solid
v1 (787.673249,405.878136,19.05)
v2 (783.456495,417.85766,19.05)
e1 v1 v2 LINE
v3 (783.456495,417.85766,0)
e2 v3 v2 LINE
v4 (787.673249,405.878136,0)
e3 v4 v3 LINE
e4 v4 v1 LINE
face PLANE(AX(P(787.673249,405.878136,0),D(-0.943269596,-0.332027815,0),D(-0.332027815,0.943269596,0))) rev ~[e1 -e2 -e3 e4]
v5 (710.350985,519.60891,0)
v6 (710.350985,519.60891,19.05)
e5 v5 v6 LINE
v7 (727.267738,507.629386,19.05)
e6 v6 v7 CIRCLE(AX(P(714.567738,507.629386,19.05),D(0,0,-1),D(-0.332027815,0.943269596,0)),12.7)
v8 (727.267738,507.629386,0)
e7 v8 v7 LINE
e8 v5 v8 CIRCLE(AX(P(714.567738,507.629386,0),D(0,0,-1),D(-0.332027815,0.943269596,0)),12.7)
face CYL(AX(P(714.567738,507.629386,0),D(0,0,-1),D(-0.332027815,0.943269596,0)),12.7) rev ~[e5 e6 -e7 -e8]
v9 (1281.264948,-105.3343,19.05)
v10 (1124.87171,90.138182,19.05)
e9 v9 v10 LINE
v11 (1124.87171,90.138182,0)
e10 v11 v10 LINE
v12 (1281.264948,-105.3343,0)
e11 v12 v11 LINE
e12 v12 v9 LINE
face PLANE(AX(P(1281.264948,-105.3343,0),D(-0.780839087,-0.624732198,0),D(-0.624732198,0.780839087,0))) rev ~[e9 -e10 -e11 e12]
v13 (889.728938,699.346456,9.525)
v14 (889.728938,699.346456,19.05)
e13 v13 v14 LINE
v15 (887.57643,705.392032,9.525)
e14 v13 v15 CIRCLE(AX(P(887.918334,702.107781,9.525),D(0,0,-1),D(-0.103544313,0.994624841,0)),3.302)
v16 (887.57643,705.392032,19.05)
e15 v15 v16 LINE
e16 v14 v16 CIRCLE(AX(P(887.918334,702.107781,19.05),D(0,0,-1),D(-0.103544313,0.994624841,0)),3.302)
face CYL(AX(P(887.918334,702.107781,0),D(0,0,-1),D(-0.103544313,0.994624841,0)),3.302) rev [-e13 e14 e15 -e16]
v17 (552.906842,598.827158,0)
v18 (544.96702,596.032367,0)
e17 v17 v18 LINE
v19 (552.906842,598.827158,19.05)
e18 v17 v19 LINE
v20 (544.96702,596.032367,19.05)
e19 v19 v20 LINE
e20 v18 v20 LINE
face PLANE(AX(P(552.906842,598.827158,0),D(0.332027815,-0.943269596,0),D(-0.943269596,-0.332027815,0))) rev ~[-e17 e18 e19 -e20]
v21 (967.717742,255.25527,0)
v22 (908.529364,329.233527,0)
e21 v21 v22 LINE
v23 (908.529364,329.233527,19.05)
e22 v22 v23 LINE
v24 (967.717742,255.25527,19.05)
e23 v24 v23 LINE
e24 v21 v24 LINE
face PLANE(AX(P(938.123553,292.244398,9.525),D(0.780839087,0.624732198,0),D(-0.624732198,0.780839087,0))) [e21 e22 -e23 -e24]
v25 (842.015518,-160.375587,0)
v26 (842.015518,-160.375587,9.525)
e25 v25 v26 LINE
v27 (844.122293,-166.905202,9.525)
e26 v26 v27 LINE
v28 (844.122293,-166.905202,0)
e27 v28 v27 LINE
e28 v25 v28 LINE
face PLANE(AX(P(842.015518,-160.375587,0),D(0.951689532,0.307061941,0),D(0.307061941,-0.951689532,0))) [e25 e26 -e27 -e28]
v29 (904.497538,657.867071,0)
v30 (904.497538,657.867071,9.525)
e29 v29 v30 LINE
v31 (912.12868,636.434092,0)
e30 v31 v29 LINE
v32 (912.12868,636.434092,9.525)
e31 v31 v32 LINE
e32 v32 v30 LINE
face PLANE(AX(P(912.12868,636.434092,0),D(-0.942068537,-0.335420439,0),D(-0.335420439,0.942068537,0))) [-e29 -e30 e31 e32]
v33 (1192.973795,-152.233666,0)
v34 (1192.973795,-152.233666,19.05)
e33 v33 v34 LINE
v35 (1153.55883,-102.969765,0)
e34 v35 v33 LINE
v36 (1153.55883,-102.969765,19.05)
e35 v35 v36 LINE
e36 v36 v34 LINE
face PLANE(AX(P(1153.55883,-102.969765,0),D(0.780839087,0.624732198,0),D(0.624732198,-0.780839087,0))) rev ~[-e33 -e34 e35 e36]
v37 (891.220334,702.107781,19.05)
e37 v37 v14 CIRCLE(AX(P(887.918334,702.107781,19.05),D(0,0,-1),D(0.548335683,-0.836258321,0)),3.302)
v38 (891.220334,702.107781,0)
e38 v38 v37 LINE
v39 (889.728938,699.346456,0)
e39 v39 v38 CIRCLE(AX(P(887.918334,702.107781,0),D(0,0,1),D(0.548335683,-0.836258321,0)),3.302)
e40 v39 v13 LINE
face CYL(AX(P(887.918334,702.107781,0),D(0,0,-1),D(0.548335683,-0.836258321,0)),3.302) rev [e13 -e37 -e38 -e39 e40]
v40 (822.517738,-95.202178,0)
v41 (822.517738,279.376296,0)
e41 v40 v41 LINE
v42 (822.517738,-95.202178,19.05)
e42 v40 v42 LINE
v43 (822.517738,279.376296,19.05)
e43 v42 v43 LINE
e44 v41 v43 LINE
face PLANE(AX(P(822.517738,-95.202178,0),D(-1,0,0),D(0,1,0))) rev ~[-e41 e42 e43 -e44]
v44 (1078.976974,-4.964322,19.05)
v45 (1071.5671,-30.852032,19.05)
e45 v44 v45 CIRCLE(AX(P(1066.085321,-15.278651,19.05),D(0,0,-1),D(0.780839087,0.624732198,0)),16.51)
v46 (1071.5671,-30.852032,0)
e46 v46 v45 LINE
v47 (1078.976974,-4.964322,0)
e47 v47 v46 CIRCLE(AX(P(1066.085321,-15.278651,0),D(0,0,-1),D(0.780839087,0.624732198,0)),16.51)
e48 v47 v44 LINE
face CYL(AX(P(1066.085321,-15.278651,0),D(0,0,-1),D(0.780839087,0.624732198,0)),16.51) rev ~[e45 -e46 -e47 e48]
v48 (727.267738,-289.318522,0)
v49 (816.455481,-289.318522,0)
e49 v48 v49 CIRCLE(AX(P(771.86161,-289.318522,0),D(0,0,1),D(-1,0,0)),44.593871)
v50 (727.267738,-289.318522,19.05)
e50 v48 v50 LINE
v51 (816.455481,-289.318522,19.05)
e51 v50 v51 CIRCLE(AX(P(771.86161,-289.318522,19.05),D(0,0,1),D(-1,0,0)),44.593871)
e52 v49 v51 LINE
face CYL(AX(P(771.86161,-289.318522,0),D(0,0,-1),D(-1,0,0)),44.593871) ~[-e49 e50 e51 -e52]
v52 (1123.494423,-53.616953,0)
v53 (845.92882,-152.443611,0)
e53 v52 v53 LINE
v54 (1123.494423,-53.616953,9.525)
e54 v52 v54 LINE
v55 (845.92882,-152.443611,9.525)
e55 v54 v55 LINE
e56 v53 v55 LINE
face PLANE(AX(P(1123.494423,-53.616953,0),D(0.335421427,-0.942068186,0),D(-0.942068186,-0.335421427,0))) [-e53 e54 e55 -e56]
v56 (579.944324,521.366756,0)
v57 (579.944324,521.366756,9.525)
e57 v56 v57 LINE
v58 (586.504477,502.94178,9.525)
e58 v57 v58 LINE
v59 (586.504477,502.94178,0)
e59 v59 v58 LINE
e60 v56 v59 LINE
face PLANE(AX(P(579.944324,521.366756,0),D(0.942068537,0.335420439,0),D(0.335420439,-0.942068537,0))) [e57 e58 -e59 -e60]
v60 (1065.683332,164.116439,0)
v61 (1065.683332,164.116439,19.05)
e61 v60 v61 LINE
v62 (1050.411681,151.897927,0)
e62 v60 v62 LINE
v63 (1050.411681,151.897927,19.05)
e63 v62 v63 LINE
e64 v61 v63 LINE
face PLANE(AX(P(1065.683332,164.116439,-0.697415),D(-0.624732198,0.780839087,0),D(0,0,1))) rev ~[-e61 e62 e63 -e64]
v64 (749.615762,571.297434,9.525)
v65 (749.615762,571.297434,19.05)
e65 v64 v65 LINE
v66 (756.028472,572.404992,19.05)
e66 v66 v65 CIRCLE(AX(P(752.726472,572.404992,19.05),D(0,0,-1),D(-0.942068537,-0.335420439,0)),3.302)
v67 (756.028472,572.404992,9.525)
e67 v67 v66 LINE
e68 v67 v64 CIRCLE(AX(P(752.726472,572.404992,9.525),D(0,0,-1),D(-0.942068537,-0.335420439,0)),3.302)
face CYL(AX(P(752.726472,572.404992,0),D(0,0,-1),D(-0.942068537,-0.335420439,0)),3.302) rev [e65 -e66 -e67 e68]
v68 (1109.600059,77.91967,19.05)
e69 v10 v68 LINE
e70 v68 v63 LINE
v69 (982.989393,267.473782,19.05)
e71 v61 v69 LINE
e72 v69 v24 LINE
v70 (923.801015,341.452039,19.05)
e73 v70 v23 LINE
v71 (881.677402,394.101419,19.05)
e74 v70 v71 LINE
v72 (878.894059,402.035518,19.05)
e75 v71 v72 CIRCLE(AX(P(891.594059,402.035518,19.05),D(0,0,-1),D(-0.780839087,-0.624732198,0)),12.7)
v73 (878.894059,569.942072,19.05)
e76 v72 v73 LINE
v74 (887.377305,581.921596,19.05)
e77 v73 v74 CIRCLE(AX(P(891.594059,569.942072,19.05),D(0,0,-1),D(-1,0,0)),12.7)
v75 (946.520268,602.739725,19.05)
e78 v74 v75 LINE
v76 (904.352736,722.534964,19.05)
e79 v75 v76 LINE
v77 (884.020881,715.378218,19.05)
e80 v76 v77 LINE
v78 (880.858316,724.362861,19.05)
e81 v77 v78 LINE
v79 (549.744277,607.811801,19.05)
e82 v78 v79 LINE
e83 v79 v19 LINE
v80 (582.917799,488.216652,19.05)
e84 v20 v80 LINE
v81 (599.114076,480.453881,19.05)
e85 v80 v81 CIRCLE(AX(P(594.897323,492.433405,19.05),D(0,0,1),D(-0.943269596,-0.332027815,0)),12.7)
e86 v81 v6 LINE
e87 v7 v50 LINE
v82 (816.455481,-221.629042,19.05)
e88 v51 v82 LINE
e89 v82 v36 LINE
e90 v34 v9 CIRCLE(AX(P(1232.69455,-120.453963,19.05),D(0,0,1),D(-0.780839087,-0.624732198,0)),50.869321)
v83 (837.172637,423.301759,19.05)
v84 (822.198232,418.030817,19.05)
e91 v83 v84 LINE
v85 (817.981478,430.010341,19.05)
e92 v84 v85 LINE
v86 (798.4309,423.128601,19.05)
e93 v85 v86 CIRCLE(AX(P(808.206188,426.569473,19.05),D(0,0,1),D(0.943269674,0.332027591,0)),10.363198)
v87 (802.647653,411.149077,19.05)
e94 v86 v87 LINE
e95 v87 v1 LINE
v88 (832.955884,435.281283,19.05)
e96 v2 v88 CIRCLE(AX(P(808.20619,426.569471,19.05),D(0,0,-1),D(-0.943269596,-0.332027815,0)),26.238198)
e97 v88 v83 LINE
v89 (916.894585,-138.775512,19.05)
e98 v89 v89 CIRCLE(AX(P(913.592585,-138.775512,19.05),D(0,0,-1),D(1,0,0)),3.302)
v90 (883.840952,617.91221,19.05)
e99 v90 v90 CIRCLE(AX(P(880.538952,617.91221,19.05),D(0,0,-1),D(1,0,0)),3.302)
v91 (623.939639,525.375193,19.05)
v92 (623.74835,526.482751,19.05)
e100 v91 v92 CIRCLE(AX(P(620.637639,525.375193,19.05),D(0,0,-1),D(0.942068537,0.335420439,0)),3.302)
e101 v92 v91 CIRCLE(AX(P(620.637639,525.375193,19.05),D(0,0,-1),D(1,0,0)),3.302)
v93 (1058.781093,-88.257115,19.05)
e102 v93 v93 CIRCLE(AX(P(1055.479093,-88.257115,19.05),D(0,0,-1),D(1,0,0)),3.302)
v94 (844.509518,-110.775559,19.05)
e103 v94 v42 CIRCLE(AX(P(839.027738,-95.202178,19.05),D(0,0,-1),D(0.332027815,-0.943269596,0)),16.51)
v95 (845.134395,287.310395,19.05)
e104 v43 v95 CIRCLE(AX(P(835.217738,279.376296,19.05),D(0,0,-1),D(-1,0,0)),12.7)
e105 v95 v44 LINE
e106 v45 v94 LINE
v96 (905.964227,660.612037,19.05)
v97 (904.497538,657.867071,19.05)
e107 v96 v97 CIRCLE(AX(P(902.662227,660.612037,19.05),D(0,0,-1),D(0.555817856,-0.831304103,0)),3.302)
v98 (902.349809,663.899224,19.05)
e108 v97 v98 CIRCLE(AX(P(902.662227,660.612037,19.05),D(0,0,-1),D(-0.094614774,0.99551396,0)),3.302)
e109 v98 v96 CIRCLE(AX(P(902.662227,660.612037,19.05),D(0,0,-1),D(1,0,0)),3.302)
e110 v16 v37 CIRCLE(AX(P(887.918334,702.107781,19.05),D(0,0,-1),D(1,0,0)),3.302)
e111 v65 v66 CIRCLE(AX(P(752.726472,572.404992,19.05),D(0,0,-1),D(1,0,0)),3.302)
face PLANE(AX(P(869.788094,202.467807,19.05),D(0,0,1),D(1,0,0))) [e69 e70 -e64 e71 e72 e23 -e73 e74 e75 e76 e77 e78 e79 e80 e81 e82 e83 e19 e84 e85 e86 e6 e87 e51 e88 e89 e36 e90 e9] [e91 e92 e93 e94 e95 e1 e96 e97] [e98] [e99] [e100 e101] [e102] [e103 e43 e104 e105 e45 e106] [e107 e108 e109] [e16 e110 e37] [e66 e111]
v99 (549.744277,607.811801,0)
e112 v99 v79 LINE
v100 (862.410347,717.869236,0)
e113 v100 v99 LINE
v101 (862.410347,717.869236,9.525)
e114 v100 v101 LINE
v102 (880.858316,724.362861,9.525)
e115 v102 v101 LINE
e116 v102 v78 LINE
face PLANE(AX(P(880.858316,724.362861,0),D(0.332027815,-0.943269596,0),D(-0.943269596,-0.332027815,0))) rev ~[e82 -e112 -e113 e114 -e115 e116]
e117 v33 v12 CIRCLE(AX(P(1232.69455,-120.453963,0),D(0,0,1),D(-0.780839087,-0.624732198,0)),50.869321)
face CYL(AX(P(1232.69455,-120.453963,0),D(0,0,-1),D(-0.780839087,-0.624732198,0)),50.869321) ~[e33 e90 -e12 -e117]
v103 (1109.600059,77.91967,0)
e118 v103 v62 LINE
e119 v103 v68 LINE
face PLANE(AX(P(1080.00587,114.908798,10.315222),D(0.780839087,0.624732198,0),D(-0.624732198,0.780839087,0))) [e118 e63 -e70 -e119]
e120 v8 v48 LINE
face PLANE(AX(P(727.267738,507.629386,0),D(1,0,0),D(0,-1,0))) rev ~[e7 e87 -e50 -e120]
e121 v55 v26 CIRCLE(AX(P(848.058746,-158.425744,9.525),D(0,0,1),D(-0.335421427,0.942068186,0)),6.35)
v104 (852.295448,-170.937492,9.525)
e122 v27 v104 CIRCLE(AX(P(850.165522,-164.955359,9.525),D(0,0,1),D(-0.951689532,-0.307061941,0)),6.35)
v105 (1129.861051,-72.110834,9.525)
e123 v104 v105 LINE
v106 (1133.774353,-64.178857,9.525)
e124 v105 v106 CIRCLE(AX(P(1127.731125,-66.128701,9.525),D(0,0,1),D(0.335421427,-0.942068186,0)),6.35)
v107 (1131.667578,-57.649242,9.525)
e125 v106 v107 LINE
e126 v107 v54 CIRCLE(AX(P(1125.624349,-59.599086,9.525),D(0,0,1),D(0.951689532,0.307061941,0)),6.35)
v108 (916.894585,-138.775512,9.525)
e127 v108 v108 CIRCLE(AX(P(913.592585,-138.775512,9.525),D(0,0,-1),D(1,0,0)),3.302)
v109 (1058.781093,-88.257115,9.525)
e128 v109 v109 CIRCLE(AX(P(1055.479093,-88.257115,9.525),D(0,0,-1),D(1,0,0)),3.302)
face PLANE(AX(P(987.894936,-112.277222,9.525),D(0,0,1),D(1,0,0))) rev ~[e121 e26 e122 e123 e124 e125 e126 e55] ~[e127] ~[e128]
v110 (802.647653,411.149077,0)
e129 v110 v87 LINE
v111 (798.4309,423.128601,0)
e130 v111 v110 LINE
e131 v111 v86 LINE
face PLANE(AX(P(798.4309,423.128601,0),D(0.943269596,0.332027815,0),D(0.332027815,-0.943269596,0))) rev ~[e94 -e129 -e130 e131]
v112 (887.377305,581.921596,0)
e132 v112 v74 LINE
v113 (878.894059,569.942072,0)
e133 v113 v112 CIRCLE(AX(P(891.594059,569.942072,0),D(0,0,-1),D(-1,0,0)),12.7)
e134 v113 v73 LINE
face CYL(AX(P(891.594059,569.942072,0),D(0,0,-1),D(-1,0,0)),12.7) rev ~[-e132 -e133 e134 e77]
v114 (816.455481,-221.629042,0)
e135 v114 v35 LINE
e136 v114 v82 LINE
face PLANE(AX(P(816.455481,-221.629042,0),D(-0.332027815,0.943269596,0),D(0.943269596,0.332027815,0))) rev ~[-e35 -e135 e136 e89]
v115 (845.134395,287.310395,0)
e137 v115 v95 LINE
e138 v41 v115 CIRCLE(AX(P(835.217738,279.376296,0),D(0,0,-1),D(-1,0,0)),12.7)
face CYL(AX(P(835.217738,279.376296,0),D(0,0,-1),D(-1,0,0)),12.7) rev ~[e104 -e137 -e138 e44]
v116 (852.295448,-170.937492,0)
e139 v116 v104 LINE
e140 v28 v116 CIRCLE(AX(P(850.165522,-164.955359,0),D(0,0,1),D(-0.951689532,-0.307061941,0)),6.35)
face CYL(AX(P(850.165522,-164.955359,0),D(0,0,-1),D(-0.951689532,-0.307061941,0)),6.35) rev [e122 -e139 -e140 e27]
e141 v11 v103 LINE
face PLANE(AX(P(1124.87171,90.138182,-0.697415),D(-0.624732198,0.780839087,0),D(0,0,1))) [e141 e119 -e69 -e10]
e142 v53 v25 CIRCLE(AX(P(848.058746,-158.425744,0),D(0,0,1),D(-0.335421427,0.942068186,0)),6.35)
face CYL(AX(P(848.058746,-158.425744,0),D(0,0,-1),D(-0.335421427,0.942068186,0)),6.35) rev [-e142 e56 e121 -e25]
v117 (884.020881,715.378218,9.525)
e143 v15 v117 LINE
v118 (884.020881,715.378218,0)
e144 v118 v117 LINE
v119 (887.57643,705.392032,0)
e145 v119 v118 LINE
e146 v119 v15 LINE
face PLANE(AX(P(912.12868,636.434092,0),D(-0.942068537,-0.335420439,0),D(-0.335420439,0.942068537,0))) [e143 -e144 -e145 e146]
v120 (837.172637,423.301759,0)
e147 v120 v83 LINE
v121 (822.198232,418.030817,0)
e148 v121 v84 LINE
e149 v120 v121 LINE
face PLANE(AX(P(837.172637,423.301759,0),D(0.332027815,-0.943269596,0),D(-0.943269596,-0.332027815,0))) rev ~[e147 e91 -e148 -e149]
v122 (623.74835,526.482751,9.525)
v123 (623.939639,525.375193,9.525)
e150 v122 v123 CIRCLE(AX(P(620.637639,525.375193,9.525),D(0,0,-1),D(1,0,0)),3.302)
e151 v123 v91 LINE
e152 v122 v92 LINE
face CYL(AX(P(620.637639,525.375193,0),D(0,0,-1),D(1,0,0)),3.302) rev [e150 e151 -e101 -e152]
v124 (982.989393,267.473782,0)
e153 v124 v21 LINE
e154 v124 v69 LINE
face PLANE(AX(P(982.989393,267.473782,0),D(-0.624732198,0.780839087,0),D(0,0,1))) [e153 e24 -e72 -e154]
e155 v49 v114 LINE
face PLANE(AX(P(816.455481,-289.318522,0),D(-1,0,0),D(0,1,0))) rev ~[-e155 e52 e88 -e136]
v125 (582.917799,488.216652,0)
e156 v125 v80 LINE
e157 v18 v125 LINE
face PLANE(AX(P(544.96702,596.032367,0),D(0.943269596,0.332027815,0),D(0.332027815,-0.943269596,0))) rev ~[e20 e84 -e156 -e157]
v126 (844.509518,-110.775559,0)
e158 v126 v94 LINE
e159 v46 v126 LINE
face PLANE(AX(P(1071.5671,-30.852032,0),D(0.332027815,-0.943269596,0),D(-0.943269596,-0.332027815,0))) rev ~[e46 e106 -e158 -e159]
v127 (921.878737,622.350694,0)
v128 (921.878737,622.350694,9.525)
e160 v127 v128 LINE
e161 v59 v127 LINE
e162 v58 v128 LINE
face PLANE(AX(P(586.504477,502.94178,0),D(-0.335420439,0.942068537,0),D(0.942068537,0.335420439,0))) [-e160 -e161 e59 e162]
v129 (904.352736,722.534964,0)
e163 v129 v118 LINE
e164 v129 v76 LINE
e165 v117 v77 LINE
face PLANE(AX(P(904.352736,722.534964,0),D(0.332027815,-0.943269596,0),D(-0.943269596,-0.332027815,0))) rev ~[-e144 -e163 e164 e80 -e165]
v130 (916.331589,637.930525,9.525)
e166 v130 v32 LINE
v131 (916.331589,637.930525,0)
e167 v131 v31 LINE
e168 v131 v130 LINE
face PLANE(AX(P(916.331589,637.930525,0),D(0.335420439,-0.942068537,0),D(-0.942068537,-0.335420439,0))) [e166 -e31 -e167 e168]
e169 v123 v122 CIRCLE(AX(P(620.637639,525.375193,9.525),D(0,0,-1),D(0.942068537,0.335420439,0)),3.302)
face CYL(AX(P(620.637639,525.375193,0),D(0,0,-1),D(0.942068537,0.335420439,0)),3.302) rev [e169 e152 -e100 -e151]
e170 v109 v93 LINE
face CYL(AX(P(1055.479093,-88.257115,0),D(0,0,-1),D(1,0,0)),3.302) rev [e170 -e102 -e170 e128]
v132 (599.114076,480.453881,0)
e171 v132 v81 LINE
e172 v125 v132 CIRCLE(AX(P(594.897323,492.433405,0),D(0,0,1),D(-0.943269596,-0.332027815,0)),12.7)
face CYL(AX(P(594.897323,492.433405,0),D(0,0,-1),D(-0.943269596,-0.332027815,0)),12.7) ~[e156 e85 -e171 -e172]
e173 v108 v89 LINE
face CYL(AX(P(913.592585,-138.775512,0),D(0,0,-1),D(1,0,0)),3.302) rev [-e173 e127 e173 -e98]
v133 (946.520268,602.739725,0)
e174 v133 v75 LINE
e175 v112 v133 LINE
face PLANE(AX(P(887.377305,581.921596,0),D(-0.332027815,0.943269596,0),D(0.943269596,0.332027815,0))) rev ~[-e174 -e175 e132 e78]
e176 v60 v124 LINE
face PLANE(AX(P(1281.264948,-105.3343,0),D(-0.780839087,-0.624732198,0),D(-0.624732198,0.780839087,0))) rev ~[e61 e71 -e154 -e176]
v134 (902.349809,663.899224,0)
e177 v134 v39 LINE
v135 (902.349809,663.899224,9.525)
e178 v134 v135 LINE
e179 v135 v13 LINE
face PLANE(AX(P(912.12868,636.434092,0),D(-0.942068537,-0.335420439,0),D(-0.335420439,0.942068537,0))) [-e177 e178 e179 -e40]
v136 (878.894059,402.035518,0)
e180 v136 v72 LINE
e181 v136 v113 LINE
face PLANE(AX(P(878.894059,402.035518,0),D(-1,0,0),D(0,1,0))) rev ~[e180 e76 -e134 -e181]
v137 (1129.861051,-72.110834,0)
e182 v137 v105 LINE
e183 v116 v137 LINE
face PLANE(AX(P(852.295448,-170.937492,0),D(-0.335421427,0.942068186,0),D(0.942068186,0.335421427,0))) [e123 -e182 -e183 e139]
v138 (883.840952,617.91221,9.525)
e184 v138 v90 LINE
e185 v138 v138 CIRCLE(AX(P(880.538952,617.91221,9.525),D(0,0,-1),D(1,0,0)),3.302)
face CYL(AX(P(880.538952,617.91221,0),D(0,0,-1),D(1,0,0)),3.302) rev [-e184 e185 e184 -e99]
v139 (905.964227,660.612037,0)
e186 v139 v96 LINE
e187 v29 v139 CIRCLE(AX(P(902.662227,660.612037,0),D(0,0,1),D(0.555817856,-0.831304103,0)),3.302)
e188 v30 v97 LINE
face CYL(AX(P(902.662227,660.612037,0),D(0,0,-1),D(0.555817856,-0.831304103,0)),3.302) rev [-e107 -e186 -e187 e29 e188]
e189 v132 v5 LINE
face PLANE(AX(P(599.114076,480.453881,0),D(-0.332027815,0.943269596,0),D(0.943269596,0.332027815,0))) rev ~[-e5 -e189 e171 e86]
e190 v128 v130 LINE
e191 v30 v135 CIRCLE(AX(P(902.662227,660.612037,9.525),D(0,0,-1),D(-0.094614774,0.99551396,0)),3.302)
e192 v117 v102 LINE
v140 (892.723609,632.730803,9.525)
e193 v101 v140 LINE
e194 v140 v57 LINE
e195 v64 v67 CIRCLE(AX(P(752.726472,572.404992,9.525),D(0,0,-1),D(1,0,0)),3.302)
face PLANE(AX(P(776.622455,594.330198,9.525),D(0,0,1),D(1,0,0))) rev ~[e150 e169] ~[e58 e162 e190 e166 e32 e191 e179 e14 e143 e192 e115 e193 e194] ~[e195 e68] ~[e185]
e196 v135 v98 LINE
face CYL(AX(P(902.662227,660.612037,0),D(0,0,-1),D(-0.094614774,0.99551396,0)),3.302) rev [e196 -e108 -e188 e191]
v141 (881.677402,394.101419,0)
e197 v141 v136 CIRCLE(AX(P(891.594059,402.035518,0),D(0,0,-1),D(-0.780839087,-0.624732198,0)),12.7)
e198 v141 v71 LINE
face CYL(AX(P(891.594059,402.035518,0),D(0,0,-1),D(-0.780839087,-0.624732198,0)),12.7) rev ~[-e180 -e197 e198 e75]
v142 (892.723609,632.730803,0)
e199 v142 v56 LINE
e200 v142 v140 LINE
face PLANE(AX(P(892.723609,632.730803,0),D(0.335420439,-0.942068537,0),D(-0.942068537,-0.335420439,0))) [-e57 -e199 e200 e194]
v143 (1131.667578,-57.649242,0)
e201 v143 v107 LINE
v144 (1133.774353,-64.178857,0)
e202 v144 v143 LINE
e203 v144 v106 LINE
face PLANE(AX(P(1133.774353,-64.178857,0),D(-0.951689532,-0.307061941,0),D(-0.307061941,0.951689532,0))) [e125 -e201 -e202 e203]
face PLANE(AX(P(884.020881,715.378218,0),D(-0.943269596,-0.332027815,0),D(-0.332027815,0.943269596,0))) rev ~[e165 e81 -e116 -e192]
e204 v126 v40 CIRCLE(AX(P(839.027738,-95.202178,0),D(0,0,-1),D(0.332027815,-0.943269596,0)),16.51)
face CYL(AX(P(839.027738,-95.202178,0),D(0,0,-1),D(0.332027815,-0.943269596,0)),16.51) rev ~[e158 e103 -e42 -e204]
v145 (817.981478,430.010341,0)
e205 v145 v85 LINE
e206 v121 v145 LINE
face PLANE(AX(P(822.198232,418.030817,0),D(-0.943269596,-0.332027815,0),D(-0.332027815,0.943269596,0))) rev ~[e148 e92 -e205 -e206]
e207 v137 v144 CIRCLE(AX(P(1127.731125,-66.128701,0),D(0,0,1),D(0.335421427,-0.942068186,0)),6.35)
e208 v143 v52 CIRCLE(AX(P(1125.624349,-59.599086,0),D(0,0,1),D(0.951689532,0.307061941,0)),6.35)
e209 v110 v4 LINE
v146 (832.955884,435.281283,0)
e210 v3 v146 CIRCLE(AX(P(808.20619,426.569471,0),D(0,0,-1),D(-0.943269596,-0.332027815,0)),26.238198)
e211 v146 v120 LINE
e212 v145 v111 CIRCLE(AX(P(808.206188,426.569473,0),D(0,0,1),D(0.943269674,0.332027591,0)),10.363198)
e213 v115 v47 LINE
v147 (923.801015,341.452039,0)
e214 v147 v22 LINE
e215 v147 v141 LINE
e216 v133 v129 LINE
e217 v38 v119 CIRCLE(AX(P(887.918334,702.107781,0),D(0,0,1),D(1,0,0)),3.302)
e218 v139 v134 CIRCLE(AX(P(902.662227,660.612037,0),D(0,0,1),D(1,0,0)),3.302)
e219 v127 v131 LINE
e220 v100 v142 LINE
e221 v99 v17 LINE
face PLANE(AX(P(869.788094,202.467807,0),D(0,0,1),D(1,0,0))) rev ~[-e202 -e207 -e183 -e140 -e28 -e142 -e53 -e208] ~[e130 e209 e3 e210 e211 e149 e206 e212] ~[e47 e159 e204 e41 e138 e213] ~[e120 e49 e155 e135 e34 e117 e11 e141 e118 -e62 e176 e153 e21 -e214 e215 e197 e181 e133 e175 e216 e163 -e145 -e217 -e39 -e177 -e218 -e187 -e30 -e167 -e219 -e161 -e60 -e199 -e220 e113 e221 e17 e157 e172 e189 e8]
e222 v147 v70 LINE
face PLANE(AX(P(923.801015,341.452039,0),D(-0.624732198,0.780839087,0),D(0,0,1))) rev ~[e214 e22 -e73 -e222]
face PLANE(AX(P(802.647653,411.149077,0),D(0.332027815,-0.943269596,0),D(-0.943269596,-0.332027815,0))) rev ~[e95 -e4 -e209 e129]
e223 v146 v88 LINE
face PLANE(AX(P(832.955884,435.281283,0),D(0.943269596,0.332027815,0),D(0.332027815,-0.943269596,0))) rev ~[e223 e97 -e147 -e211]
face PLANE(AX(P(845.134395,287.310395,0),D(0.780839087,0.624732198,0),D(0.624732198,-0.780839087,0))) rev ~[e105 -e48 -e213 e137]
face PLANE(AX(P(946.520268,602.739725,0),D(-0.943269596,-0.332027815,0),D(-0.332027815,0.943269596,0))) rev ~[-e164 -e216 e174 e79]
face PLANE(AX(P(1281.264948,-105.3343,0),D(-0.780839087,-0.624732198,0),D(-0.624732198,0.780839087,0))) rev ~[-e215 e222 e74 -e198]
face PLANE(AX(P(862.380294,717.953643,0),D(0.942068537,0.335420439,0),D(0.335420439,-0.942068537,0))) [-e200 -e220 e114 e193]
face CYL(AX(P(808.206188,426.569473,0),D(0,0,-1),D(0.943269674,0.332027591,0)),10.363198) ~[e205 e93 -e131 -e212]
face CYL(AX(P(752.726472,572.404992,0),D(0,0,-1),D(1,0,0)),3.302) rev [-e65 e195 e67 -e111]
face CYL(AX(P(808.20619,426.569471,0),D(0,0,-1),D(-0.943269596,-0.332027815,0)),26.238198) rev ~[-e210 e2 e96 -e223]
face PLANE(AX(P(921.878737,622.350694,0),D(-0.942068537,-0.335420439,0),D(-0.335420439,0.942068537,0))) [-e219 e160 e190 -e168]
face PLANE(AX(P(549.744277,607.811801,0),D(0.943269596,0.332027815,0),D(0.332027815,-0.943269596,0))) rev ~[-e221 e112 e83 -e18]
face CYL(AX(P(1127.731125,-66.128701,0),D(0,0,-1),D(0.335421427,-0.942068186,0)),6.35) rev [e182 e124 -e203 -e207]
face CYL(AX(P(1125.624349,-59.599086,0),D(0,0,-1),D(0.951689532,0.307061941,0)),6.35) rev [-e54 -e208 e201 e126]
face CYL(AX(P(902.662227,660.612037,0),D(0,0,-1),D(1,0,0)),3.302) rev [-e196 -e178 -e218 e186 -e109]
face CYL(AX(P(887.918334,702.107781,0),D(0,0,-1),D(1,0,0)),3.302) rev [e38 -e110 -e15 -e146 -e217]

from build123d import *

# Parameters (mm, degrees)
F1_DEPTH = 19.05
F3_DEPTH = 9.525
F5_DEPTH = 9.525
F6_W     = 94.742
F6_H     = 19.05
F6_H_2   = 22.0252738774
F7_DEPTH = 19.558
F8_R     = 3.302
F9_DEPTH = 19.051


# Not quite as in the source:
# - ends of sketch curves that miss each other by under 0.0002 mm in the source are joined
# - a feature names something its author has since deleted; it is built from what else it names
# - the program builds the solid bodies; features that only make, move or delete a surface that nothing else refers to are left out


with BuildPart() as f1:
    # F0 (on Top) → F1 (new body)
    with BuildSketch(Plane.XY):
        with BuildLine():
            Line((727.2677384075, 507.6293858847), (727.2677384075, -289.3185215378))
            ThreePointArc((727.2677384075, -289.3185215378), (771.8616098047, -333.912392935), (816.4554812019, -289.3185215378))
            Line((816.4554812019, -289.3185215378), (816.4554812019, -221.6290421598))
            Line((816.4554812019, -221.6290421598), (1153.5588304871, -102.9697649078))
            Line((1153.5588304871, -102.9697649078), (1192.9737952894, -152.2336658633))
            ThreePointArc((1192.9737952894, -152.2336658633), (1256.5580507142, -165.3785793409), (1281.2649482254, -105.3342998163))
            Line((1281.2649482254, -105.3342998163), (881.6774022659, 394.10141923))
            ThreePointArc((881.6774022659, 394.10141923), (879.6100790274, 397.83144491), (878.8940586752, 402.0355181492))
            Line((878.8940586752, 402.0355181492), (878.8940586752, 569.9420720746))
            ThreePointArc((878.8940586752, 569.9420720746), (881.2296299338, 577.2815963686), (887.3773054254, 581.9215959395))
            Line((887.3773054254, 581.9215959395), (946.5202680448, 602.7397254948))
            Line((946.5202680448, 602.7397254948), (904.3527355464, 722.5349641439))
            Line((904.3527355464, 722.5349641439), (884.020881133, 715.3782178375))
            Line((884.020881133, 715.3782178375), (880.8583161956, 724.3628607361))
            Line((880.8583161956, 724.3628607361), (549.7442765695, 607.8118009104))
            Line((549.7442765695, 607.8118009104), (552.906841507, 598.8271580117))
            Line((552.906841507, 598.8271580117), (544.9670195991, 596.0323666485))
            Line((544.9670195991, 596.0323666485), (582.9177988478, 488.2166518643))
            ThreePointArc((582.9177988478, 488.2166518643), (589.40821497, 480.9809077363), (599.1140759625, 480.4538812492))
            Line((599.1140759625, 480.4538812492), (710.3509851577, 519.6089097496))
            ThreePointArc((710.3509851577, 519.6089097497), (721.9072627016, 517.9938146262), (727.2677384075, 507.6293858847))
        make_face()
        with BuildLine():
            ThreePointArc((844.5095176323, -110.7755588107), (829.4863568252, -108.6759351502), (822.5177384075, -95.2021777863))
            Line((822.5177384075, -95.2021777863), (822.5177384075, 279.3762959499))
            ThreePointArc((822.5177384075, 279.3762959499), (831.0136651683, 291.3602755977), (845.1343948168, 287.3103948691))
            Line((845.1343948168, 287.3103948691), (1078.976974464, -4.9643221252))
            ThreePointArc((1078.976974464, -4.9643221252), (1081.9579117622, -19.8218837855), (1071.5671003568, -30.8520317446))
            Line((1071.5671003568, -30.8520317446), (844.5095176323, -110.7755588107))
        make_face(mode=Mode.SUBTRACT)
        with BuildLine():
            Line((822.1982316908, 418.0308171084), (817.981478441, 430.0103409733))
            ThreePointArc((817.981478441, 430.0103409733), (804.7653209472, 436.3447634256), (798.4309001253, 423.1286012999))
            Line((798.4309001253, 423.1286012999), (802.6476533752, 411.149077435))
            Line((802.6476533752, 411.149077435), (787.6732485441, 405.8781358727))
            Line((787.6732485441, 405.8781358727), (783.4564952942, 417.8576597376))
            ThreePointArc((783.4564952942, 417.8576597376), (799.4943781806, 451.3191657439), (832.9558841868, 435.2812828576))
            Line((832.9558841868, 435.2812828576), (837.1726374367, 423.3017589927))
            Line((837.1726374367, 423.3017589927), (822.1982316908, 418.0308171084))
        make_face(mode=Mode.SUBTRACT)
    extrude(amount=F1_DEPTH)

    # F2 (on face) → F3 (cut)
    with BuildSketch(Plane.XY):
        with BuildLine():
            ThreePointArc((844.1222933391, -166.9052020902), (847.3560158569, -170.6500208272), (852.2954479263, -170.9374917442))
            Line((852.2954479263, -170.9374917442), (1129.8610507564, -72.1108335167))
            ThreePointArc((1129.8610507564, -72.1108335167), (1133.425786756, -68.9382065458), (1133.77435322, -64.1788572139))
            Line((1133.77435322, -64.1788572139), (1131.667577719, -57.6492424267))
            ThreePointArc((1131.667577719, -57.6492424267), (1128.4338552012, -53.9044236898), (1123.4944231318, -53.6169527728))
            Line((1123.4944231318, -53.6169527728), (845.9288203018, -152.4436110002))
            ThreePointArc((845.9288203018, -152.4436110002), (842.3640843021, -155.6162379711), (842.0155178382, -160.3755873031))
            Line((842.0155178382, -160.3755873031), (844.1222933391, -166.9052020902))
        make_face()
    extrude(amount=F3_DEPTH, mode=Mode.SUBTRACT)

    # F4 (on face) → F5 (cut)
    with BuildSketch(Plane.XY):
        Polygon((579.9443241227, 521.366756094), (586.5044770697, 502.9417796404), (921.8787370541, 622.3506942479), (916.3315891482, 637.930524532), (912.1286802343, 636.4340924814), (884.020881133, 715.3782178375), (880.8583161956, 724.3628607361), (862.3802941818, 717.9536434315), (892.7236092325, 632.7308033777), align=None)
    extrude(amount=F5_DEPTH, mode=Mode.SUBTRACT)

    # F6 (on face) → F7 (cut)
    with BuildSketch(Plane(origin=(729.8159568657, 583.9097126711, 0), x_dir=(-0.6247321984, 0.7808390873, 0), z_dir=(0.7808390873, 0.6247321984, 0))):
        with Locations((-357.8801403508, 9.525)):
            Rectangle(F6_W, F6_H)
        with Locations((-584.9891603508, 10.3152221296)):
            Rectangle(F6_W, F6_H_2)
    extrude(amount=-F7_DEPTH, mode=Mode.SUBTRACT)

    # F8 (on face) → F9 (cut, through all)
    with BuildSketch(Plane.XY):
        with BuildLine():
            ThreePointArc((902.3498094673, 663.8992240234), (899.5515171423, 659.5044786379), (904.4975380125, 657.8670707804))
            Line((904.4975380125, 657.8670707804), (902.3498094673, 663.8992240234))
        make_face()
        with BuildLine():
            ThreePointArc((887.5764301967, 705.3920317976), (884.8076232072, 701.0002222812), (889.7289379426, 699.3464555963))
            Line((889.7289379426, 699.3464555963), (887.5764301967, 705.3920317976))
        make_face()
        with BuildLine():
            Line((887.5764301967, 705.3920317976), (889.7289379426, 699.3464555963))
            ThreePointArc((889.7289379426, 699.3464555963), (890.8236579238, 700.5386106967), (891.2203335175, 702.107780571))
            ThreePointArc((891.2203335175, 702.107780571), (890.1290165833, 704.5605513272), (887.5764301967, 705.3920317976))
        make_face()
        with BuildLine():
            Line((902.3498094673, 663.8992240234), (904.4975380125, 657.8670707804))
            ThreePointArc((904.4975380125, 657.8670707804), (905.5745632393, 659.0559185948), (905.9642274527, 660.6120369276))
            ThreePointArc((905.9642274527, 660.6120369276), (904.8838934731, 663.0548639976), (902.3498094673, 663.8992240234))
        make_face()
        with Locations((880.5389518172, 617.9122097817)):
            Circle(F8_R)
        with BuildLine():
            ThreePointArc((623.7483495144, 526.4827509324), (617.3838130375, 524.8132146381), (623.9396392041, 525.3751926427))
            ThreePointArc((623.9396392041, 525.3751926427), (623.8914653707, 525.9371706472), (623.7483495144, 526.4827509324))
        make_face()
        with BuildLine():
            ThreePointArc((756.0284718398, 572.4049919407), (752.1644938352, 575.6588181073), (749.6157615295, 571.2974336509))
            ThreePointArc((749.6157615295, 571.2974336509), (753.2884498444, 569.1511657741), (756.0284718398, 572.4049919407))
        make_face()
        with Locations((1055.4790926394, -88.2571151612)):
            Circle(F8_R)
        with Locations((913.5925848765, -138.7755124943)):
            Circle(F8_R)
    extrude(amount=F9_DEPTH, mode=Mode.SUBTRACT)


solid = f1.part
